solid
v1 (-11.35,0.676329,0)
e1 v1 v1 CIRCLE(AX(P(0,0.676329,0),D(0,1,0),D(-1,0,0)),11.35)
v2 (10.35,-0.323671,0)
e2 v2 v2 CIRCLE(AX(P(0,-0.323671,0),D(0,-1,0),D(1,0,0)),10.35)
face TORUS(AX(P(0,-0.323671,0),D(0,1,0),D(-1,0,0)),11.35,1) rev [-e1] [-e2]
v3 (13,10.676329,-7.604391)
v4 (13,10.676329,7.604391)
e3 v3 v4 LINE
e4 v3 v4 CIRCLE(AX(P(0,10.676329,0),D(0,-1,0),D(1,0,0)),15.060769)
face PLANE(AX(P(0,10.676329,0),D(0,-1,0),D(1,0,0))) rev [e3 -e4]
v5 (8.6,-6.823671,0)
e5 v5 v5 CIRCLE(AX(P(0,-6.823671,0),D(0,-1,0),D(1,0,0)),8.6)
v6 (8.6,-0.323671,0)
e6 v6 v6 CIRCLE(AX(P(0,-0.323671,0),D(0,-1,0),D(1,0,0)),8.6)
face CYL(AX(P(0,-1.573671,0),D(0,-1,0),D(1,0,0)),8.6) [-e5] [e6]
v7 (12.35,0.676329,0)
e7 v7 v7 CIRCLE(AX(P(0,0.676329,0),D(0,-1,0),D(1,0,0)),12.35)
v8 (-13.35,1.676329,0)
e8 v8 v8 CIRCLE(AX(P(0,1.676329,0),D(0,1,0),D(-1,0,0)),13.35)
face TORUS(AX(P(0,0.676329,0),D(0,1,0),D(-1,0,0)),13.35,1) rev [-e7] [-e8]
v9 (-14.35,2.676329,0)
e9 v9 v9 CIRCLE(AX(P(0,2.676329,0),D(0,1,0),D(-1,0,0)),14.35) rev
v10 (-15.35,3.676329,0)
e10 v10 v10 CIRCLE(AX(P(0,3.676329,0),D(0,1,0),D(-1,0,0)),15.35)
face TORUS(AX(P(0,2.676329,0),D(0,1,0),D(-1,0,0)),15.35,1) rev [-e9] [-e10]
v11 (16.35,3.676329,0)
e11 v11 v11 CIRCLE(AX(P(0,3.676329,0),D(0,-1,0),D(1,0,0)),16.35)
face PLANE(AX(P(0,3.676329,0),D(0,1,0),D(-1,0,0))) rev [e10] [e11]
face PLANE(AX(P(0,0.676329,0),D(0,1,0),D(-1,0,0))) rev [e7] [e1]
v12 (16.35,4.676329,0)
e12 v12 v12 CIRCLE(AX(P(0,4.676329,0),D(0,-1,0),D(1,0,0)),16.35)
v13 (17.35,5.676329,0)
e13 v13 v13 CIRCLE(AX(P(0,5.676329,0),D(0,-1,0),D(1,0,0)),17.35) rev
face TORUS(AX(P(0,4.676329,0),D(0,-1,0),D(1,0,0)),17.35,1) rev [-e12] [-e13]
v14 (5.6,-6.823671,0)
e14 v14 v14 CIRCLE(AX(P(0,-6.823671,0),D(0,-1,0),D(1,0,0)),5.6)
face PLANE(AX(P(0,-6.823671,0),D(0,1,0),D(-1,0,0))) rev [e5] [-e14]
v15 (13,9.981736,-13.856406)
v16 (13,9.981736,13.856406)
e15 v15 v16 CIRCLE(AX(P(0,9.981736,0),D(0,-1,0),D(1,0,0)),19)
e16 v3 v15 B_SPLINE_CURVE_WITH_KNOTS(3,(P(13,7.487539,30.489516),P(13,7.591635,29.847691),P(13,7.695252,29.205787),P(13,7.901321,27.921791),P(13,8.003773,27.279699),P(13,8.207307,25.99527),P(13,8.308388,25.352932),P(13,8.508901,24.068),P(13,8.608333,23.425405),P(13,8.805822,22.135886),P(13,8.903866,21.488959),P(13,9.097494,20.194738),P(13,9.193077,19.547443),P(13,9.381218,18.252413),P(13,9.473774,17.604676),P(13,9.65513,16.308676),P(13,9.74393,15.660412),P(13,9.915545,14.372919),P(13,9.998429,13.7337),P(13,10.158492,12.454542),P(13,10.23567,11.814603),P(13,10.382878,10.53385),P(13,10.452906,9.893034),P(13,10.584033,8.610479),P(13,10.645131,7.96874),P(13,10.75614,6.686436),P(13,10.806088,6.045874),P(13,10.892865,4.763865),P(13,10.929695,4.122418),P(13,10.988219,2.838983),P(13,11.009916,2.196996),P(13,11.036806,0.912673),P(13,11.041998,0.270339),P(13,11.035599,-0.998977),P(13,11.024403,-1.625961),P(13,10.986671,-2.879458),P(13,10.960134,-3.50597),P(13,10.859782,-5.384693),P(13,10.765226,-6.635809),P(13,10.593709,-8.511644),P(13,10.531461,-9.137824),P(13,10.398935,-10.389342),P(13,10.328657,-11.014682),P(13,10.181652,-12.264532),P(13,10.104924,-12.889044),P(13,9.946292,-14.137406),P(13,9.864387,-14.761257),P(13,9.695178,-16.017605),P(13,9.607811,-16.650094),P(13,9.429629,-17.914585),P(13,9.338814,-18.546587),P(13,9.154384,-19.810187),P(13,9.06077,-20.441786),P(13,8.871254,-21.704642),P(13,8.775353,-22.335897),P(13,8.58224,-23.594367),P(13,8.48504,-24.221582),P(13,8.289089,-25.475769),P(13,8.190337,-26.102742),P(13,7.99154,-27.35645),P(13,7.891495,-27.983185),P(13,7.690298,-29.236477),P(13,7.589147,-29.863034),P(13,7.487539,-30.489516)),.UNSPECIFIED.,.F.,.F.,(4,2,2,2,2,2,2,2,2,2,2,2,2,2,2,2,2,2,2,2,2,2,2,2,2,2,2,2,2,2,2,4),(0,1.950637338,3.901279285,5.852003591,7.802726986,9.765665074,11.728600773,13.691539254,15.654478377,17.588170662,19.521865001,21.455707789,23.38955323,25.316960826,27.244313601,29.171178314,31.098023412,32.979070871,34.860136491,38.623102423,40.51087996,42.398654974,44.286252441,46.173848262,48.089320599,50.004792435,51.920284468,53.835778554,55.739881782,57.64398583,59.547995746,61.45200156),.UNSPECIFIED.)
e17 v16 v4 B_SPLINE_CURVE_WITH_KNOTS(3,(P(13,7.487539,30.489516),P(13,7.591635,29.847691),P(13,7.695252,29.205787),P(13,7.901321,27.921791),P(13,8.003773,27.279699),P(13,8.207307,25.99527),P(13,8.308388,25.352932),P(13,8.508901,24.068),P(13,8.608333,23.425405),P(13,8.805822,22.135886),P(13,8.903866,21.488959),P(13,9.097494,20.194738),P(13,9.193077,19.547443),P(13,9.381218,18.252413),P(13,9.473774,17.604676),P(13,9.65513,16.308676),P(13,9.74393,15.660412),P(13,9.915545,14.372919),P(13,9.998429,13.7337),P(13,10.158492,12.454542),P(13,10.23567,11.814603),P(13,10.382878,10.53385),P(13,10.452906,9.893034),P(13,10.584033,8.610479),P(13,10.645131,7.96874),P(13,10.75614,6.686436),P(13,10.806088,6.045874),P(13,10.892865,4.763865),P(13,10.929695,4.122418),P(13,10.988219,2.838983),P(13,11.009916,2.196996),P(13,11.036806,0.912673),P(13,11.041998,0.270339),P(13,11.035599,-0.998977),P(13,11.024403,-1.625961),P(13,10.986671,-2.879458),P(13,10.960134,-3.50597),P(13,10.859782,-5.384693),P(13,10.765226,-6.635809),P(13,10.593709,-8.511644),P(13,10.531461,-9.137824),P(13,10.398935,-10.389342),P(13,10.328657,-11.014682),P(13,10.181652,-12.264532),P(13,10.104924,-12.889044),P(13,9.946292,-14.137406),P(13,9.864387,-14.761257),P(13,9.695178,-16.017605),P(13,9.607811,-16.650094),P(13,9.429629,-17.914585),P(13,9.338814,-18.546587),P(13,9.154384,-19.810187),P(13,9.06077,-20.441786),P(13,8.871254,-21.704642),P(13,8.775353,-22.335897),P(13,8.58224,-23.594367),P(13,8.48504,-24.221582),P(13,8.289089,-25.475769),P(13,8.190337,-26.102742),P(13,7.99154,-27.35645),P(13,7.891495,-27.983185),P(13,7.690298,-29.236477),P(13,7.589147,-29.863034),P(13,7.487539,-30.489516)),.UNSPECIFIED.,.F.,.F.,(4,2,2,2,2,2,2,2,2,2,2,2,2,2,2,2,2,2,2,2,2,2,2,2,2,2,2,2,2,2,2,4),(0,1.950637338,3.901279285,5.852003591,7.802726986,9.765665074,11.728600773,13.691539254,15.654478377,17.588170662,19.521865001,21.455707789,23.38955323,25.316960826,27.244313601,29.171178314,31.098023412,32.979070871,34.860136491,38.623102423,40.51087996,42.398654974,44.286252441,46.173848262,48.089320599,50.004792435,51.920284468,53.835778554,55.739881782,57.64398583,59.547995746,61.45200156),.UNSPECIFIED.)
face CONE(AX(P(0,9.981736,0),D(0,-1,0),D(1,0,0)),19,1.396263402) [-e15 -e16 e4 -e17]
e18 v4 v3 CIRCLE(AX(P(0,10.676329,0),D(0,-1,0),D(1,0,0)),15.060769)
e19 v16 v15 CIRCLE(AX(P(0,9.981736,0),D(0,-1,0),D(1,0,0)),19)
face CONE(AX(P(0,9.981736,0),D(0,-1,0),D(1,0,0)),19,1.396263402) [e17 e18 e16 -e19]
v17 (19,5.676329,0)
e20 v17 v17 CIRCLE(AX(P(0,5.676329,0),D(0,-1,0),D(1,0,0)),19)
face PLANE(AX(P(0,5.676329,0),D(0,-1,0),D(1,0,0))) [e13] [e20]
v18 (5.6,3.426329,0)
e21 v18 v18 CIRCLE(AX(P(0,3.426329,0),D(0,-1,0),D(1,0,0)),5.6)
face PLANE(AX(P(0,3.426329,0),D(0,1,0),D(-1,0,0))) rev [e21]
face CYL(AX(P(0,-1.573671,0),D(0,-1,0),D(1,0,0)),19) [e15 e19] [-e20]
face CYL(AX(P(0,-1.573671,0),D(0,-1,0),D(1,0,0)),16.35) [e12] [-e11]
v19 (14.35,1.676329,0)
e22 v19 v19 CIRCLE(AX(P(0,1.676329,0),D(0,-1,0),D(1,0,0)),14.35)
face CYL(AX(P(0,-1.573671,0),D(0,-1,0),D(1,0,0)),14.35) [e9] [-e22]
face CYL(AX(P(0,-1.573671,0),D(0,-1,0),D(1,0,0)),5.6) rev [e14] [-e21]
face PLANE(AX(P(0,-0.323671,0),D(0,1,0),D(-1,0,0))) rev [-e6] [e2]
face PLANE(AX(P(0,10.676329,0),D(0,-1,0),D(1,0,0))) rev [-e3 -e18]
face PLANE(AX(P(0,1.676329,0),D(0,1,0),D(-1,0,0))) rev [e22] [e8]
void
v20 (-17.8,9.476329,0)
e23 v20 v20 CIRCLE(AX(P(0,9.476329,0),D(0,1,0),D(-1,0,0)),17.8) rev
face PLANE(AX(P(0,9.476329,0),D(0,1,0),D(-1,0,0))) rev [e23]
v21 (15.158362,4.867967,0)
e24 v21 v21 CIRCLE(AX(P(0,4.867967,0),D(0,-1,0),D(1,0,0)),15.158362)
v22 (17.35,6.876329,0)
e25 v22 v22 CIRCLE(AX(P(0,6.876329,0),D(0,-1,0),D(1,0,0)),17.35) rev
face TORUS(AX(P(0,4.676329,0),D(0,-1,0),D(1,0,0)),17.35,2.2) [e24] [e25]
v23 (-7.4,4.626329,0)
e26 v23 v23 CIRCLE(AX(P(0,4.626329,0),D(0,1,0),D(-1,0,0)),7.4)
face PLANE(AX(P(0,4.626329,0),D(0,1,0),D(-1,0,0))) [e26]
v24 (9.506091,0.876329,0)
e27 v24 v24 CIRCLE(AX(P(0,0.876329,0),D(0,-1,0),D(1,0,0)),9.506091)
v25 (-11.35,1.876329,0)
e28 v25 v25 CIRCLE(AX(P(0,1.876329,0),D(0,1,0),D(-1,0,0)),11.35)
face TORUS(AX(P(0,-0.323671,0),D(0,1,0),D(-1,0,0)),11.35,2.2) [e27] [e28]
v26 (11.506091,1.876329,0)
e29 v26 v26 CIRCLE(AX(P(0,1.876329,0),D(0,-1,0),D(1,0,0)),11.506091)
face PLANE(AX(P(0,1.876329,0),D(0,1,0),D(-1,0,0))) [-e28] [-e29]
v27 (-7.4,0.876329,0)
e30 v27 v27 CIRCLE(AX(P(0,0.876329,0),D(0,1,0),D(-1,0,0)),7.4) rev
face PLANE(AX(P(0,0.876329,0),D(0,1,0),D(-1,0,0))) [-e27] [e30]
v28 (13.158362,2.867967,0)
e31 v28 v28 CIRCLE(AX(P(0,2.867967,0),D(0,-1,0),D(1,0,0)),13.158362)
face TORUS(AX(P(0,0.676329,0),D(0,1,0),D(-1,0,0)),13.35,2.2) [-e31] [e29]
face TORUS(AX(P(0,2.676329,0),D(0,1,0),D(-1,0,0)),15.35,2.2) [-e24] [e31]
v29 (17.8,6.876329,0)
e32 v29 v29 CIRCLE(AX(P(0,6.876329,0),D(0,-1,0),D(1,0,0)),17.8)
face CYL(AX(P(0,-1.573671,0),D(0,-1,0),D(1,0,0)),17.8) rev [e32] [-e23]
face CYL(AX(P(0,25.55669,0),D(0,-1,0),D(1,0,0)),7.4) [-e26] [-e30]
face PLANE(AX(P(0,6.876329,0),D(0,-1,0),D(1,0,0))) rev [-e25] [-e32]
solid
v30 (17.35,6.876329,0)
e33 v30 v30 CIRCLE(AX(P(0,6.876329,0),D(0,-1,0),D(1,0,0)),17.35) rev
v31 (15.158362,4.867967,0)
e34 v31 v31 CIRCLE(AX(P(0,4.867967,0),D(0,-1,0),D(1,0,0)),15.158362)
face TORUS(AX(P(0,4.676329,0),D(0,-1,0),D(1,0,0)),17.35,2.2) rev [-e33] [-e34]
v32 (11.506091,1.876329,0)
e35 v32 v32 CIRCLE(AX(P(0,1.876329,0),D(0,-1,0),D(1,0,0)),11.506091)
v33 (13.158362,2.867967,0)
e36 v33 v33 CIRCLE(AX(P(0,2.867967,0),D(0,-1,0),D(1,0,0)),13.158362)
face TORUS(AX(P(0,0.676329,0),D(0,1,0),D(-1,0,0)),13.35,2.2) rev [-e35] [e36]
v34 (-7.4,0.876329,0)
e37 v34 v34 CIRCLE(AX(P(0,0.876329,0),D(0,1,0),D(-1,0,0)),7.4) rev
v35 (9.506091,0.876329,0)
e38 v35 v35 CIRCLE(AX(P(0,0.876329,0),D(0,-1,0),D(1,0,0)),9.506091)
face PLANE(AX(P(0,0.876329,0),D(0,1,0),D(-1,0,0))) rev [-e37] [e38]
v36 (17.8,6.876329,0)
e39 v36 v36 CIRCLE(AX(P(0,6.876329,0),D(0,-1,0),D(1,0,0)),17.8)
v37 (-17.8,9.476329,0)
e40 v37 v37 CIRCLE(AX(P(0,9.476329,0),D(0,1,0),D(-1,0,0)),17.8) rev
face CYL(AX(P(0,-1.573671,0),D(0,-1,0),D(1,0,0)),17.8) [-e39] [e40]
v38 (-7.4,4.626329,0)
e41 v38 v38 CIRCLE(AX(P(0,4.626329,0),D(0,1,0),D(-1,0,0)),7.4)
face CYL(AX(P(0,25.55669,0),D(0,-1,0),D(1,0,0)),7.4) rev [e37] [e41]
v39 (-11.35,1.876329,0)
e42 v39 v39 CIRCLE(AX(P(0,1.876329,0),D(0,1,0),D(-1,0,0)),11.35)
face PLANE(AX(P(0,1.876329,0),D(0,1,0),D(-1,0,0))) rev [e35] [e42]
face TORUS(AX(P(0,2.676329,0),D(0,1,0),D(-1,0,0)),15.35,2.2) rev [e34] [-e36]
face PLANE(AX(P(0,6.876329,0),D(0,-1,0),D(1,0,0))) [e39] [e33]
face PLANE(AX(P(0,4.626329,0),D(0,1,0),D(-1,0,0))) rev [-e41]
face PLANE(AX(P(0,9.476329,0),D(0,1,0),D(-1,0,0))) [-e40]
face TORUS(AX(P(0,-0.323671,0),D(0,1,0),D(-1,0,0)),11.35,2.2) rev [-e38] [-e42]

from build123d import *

# Parameters (mm, degrees)
CUT_EXTRUDE1_DEPTH        = 30.53070436
CUT_EXTRUDE1_DEPTH_BACK   = 5
FILLET1_R                 = 1
SKETCH3_R                 = 8.6
BOSS_EXTRUDE1_DEPTH       = 10.25
SKETCH3_3_R               = 3
CUT_EXTRUDE2_DEPTH        = 5
BOSS_EXTRUDE2_OUTLINE_R   = 7.4
BOSS_EXTRUDE2_OUTLINE_R_2 = 6.8
BOSS_EXTRUDE2_DEPTH       = 10.25


# Read off the part's stored shape, not the designer's step: Shell3, Boss-Extrude2, Intersect1
with BuildPart() as part:
    # Sketch1 → Revolve1 (revolve)
    with BuildSketch(Plane.XY, mode=Mode.PRIVATE) as revolve1_sk:
        Polygon((-15.060768988, 10.676328976), (-19, 9.981736265), (-19, 5.676328976), (-16.35, 5.676328976), (-16.35, 3.676328976), (-14.35, 3.676328976), (-14.35, 1.676328976), (-12.35, 1.676328976), (-12.35, 0.676328976), (-10.35, 0.676328976), (-10.35, -0.323671024), (-8.6, -0.323671024), (-8.6, -6.823671024), (-5.6, -6.823671024), (-5.6, 3.426328976), (-3, 3.426328976), (-3, -1.573671024), (0, -1.573671024), (0, 10.676328976), align=None)
    revolve(revolve1_sk.sketch.rotate(Axis((0, -1.573671024, 0), (0, 1, 0)), 180), axis=Axis((0, -1.573671024, 0), (0, 1, 0)))

    # Sketch2 → Cut-Extrude1 (cut, two sides: drawn at the far end of the back side and taken through both)
    with BuildSketch(Plane.XZ.offset(1.573671024).offset(-CUT_EXTRUDE1_DEPTH_BACK)):
        Polygon((-5.85, 1.85), (-6.6, 1.1), (-6.6, -1.1), (-5.85, -1.85), (-0.35, -1.85), (0.4, -1.1), (0.4, 1.1), (-0.35, 1.85), align=None)
    extrude(amount=CUT_EXTRUDE1_DEPTH + CUT_EXTRUDE1_DEPTH_BACK, mode=Mode.SUBTRACT)

    # Fillet1
    fillet1_edges = [part.edges().sort_by_distance(p)[0] for p in [
        (-12.35, 1.676328976, 0),
        (-14.35, 3.676328976, 0),
        (-16.35, 5.676328976, 0),
        (-10.35, 0.676328976, 0),
    ]]
    fillet(fillet1_edges, radius=FILLET1_R - 0.0001)  # a hair under: the kernel refuses the full size


with BuildPart() as body_2:
    # Split1: the piece on the far side of the plane
    add(part.part)
    split(bisect_by=Plane(origin=(0, 9.476328976, 0), x_dir=(1, 0, 0), z_dir=(0, 1, 0)), keep=Keep.BOTTOM)

    # Sketch3 → Boss-Extrude1 (add)
    # profile 1 of 2: a face of its own
    with BuildSketch(Plane.XZ.offset(-3.426328976)):
        Circle(SKETCH3_R)
        with BuildLine():
            ThreePointArc((-5.285593628, -1.85), (5.6, 0), (-5.285593628, 1.85))
            Line((-5.285593628, 1.85), (-5.85, 1.85))
            Line((-5.85, 1.85), (-6.6, 1.1))
            Line((-6.6, 1.1), (-6.6, -1.1))
            Line((-6.6, -1.1), (-5.85, -1.85))
            Line((-5.85, -1.85), (-5.285593628, -1.85))
        make_face(mode=Mode.SUBTRACT)
    # profile 2 of 2: a face of its own
    with BuildSketch(Plane.XZ.offset(-3.426328976)):
        with BuildLine():
            ThreePointArc((-5.285593628, -1.85), (-5.6, 0), (-5.285593628, 1.85))
            Line((-5.285593628, 1.85), (-5.85, 1.85))
            Line((-5.85, 1.85), (-6.6, 1.1))
            Line((-6.6, 1.1), (-6.6, -1.1))
            Line((-6.6, -1.1), (-5.85, -1.85))
            Line((-5.85, -1.85), (-5.285593628, -1.85))
        make_face()
    extrude(amount=BOSS_EXTRUDE1_DEPTH)

    # Sketch3<3> → Cut-Extrude2 (cut)
    with BuildSketch(Plane.XZ.offset(-3.426328976)):
        Circle(SKETCH3_3_R)
    extrude(amount=CUT_EXTRUDE2_DEPTH, mode=Mode.SUBTRACT)

    # Shell3 outline → Shell3 (revolve, cut)
    with BuildSketch(Plane.XY):
        with BuildLine():
            ThreePointArc((15.158362471, 4.867966504), (15.86366265, 6.298303477), (17.35, 6.876328976))
            Line((17.35, 6.876328976), (17.8, 6.876328976))
            Line((17.8, 6.876328976), (17.8, 9.476328976))
            Line((17.8, 9.476328976), (0, 9.476328976))
            Line((0, 9.476328976), (0, 4.626328976))
            Line((0, 4.626328976), (6.8, 4.626328976))
            Line((6.8, 4.626328976), (6.8, -5.623671024))
            Line((6.8, -5.623671024), (7.4, -5.623671024))
            Line((7.4, -5.623671024), (7.4, 0.876328976))
            Line((7.4, 0.876328976), (9.506091109, 0.876328976))
            ThreePointArc((9.506091109, 0.876328976), (10.301191152, 1.610236936), (11.35, 1.876328976))
            Line((11.35, 1.876328976), (11.506091109, 1.876328976))
            ThreePointArc((11.506091109, 1.876328976), (12.217878737, 2.562675032), (13.158362471, 2.867966504))
            ThreePointArc((13.158362471, 2.867966504), (13.794365081, 4.231963894), (15.158362471, 4.867966504))
        make_face()
    revolve(axis=Axis((0, 0, 0), (0, 1, 0)), mode=Mode.SUBTRACT)

    # Boss-Extrude2 outline → Boss-Extrude2 (add)
    with BuildSketch(Plane(origin=(0, -5.623671024, 0), x_dir=(1, 0, 0), z_dir=(0, 1, 0))):
        Circle(BOSS_EXTRUDE2_OUTLINE_R)
        Circle(BOSS_EXTRUDE2_OUTLINE_R_2, mode=Mode.SUBTRACT)
    extrude(amount=BOSS_EXTRUDE2_DEPTH)


with BuildPart() as part_1:
    add(part.part)

    # Split1
    split(bisect_by=Plane(origin=(0, 9.476328976, 0), x_dir=(1, 0, 0), z_dir=(0, 1, 0)), keep=Keep.TOP)

    # Combine1: union body 2
    add(body_2.part)


with BuildPart() as body_3:
    # Intersect1 outline → Intersect1 (revolve)
    with BuildSketch(Plane.XY):
        with BuildLine():
            Line((17.8, 6.876328976), (17.8, 9.476328976))
            Line((17.8, 9.476328976), (0, 9.476328976))
            Line((0, 9.476328976), (0, 4.626328976))
            Line((0, 4.626328976), (7.4, 4.626328976))
            Line((7.4, 4.626328976), (7.4, 0.876328976))
            Line((7.4, 0.876328976), (9.506091109, 0.876328976))
            ThreePointArc((9.506091109, 0.876328976), (10.301191152, 1.610236936), (11.35, 1.876328976))
            Line((11.35, 1.876328976), (11.506091109, 1.876328976))
            ThreePointArc((11.506091109, 1.876328976), (12.217878737, 2.562675032), (13.158362471, 2.867966504))
            ThreePointArc((13.158362471, 2.867966504), (13.794365081, 4.231963894), (15.158362471, 4.867966504))
            ThreePointArc((15.158362471, 4.867966504), (15.86366265, 6.298303477), (17.35, 6.876328976))
            Line((17.35, 6.876328976), (17.8, 6.876328976))
        make_face()
    revolve(axis=Axis((0, 0, 0), (0, 1, 0)))


solid = Compound([part_1.part, body_3.part])
